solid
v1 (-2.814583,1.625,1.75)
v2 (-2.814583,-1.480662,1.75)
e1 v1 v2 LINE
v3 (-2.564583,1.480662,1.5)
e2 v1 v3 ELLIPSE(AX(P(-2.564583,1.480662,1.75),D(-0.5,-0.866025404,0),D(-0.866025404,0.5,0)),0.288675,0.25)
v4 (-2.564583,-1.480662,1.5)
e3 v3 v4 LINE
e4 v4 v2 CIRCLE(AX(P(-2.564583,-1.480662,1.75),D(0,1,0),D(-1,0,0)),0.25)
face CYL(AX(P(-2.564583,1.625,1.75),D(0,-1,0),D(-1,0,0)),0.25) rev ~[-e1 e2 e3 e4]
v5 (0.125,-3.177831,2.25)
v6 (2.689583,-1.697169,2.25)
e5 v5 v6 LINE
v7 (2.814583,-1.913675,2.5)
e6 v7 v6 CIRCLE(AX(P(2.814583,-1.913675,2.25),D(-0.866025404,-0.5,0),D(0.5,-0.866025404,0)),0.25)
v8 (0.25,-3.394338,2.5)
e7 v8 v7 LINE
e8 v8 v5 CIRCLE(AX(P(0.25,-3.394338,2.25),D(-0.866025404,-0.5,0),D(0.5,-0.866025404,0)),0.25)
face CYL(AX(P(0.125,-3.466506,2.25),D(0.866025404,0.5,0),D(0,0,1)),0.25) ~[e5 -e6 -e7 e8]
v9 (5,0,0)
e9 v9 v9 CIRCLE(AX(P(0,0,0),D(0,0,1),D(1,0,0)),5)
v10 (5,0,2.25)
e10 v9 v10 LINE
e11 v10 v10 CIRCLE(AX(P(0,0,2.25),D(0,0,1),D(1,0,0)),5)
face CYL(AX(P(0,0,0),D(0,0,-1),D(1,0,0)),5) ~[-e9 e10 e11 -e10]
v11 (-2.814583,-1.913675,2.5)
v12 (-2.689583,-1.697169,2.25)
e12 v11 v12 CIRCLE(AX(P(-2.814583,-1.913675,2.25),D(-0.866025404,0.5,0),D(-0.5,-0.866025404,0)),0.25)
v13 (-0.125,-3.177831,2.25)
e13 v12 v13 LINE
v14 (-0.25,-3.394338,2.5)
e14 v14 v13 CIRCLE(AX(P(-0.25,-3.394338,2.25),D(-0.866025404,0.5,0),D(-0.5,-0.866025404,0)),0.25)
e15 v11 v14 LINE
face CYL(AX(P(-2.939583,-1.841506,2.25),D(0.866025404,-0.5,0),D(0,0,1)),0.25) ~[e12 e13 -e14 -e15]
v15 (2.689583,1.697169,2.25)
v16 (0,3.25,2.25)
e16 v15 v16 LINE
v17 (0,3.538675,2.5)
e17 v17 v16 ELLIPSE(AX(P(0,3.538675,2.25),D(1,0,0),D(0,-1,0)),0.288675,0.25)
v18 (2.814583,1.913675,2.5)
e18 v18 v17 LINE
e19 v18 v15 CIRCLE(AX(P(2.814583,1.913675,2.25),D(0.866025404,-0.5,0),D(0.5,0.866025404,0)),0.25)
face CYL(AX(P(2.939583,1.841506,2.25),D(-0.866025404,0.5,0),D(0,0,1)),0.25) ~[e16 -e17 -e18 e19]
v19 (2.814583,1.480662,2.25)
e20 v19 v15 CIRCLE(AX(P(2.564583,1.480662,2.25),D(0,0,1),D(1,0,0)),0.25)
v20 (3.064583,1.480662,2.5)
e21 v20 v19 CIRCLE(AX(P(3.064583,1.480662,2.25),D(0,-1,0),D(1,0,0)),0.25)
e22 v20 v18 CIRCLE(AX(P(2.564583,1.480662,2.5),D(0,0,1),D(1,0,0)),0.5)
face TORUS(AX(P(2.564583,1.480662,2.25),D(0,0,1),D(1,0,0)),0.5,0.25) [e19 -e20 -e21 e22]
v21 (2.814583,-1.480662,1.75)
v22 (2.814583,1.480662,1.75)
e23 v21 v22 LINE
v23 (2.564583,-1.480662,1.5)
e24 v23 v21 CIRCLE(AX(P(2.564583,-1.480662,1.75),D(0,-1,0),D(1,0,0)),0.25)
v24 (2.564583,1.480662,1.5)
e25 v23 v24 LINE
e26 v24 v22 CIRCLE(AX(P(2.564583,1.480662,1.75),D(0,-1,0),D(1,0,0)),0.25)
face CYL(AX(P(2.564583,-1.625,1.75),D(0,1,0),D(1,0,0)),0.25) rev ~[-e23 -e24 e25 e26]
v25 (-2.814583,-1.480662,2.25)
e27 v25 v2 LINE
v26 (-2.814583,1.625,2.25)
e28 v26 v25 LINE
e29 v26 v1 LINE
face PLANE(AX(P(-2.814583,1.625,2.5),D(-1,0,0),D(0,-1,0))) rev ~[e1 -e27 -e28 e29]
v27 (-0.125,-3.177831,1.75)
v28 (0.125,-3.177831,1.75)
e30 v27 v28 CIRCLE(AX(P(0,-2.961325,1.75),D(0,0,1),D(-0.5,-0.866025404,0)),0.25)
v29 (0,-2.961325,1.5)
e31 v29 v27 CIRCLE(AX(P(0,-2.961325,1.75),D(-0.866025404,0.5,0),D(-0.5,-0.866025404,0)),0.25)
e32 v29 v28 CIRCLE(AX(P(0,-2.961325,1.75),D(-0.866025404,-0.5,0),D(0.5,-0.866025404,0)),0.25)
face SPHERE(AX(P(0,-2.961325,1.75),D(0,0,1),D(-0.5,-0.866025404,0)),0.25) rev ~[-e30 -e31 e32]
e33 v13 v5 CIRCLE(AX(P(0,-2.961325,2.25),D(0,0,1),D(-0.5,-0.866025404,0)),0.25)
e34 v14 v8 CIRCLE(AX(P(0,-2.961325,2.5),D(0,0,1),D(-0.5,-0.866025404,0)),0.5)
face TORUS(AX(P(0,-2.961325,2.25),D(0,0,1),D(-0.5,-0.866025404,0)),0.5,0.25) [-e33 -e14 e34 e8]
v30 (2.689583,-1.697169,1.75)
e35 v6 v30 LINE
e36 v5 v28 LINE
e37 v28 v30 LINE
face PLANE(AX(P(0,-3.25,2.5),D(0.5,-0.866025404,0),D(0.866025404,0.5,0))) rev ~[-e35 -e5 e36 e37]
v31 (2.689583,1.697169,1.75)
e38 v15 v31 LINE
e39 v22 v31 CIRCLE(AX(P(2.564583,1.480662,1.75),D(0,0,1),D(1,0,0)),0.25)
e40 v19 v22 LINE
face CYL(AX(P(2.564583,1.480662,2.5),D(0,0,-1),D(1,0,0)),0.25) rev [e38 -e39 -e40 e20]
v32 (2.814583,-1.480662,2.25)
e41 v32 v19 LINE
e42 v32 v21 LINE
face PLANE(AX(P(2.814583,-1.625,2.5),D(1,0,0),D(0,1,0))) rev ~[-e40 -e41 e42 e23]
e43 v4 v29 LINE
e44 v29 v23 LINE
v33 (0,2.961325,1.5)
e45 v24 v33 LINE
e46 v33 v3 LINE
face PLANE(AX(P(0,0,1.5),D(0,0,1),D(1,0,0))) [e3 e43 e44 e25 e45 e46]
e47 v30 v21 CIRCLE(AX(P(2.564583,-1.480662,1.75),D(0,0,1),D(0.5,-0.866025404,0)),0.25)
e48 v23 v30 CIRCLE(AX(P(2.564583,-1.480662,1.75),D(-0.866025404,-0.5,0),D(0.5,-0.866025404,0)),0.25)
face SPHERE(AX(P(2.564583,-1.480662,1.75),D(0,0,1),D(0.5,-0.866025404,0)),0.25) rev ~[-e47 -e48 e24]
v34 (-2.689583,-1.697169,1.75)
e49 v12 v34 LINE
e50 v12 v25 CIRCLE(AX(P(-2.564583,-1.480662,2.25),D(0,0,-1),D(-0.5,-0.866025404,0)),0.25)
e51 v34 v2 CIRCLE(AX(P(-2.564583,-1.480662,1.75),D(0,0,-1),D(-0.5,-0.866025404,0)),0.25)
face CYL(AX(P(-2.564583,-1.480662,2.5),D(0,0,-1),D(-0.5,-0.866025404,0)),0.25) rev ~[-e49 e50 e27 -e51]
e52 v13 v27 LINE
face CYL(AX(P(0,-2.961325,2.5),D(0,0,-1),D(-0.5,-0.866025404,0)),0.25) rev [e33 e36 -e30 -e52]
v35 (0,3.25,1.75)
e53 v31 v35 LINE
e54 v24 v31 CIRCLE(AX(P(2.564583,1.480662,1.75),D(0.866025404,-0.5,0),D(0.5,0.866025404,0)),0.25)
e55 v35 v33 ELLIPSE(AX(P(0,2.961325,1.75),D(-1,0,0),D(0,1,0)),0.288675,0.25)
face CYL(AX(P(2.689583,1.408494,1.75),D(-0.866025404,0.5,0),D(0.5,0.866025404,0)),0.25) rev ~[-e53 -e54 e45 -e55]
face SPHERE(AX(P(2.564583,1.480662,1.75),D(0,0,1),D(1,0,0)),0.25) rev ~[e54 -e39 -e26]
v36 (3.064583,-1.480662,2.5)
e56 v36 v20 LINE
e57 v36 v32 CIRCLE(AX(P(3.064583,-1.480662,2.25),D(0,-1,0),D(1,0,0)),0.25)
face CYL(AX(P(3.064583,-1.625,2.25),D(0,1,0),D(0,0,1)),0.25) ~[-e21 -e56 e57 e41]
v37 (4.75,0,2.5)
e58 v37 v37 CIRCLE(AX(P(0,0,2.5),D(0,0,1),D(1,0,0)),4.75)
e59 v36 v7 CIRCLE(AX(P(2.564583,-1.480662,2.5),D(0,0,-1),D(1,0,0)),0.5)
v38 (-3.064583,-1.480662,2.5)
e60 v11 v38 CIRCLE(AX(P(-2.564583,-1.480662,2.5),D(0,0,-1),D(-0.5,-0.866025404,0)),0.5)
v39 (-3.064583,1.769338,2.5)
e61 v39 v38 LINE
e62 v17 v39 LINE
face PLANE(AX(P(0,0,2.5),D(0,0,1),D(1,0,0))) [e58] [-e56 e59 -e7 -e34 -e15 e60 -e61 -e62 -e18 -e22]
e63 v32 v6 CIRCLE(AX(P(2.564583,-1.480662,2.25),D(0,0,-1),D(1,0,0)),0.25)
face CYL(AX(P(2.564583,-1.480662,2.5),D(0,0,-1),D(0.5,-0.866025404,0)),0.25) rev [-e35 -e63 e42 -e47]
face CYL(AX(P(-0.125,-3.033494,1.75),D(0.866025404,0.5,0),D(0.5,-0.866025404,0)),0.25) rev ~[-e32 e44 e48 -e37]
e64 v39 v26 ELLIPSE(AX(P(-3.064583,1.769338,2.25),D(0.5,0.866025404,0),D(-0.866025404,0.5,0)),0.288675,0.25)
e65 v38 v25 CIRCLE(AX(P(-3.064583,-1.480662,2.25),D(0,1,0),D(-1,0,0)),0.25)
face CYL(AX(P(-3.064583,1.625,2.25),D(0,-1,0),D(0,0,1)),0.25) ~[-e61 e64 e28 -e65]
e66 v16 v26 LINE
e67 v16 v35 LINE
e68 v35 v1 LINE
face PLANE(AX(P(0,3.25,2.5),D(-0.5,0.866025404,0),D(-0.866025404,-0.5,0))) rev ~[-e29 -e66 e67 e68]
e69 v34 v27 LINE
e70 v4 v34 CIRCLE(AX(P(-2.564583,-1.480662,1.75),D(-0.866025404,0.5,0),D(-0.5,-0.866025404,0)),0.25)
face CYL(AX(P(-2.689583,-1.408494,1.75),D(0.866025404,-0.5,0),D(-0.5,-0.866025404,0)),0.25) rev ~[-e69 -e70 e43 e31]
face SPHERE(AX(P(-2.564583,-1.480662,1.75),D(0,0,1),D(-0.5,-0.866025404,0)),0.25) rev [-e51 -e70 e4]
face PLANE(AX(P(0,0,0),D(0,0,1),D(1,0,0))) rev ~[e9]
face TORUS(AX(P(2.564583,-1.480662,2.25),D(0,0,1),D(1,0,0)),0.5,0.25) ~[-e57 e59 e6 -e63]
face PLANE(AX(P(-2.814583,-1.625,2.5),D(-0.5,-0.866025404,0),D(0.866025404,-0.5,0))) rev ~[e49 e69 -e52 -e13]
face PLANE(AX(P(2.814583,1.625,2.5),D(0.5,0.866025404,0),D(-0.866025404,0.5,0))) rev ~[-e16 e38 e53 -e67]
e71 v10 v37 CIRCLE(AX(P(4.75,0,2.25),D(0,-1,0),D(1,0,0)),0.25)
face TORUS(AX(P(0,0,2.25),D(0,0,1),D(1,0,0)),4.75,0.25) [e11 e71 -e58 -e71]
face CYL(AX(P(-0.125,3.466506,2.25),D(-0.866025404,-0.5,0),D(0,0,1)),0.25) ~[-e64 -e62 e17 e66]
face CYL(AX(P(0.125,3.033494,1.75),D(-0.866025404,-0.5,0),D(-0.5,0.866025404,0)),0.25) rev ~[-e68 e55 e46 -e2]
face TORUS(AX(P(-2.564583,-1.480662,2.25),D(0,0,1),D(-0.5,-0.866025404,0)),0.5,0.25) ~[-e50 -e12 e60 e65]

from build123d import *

# Parameters (mm, degrees)
F0_R     = 5
F1_DEPTH = 2.5
F3_DEPTH = 1
F4_R     = 0.25


with BuildPart() as f1:
    # F0 (on Top) → F1 (new body)
    with BuildSketch(Plane.XY):
        Circle(F0_R)
    extrude(amount=F1_DEPTH)

    # F2 (on face) → F3 (cut)
    with BuildSketch(Plane.XY.offset(2.5)):
        Polygon((-2.8145825623, -1.625), (0, -3.25), (2.8145825623, -1.625), (2.8145825623, 1.625), (0, 3.25), (-2.8145825623, 1.625), align=None)
    extrude(amount=-F3_DEPTH, mode=Mode.SUBTRACT)

    # F4
    f4_edges = [f1.edges().sort_by_distance(p)[0] for p in [
        (-1.407291, -2.4375, 1.5),
        (1.407291, -2.4375, 1.5),
        (2.814583, 0, 1.5),
        (1.407291, 2.4375, 1.5),
        (-1.407291, 2.4375, 1.5),
        (-2.814583, 0, 1.5),
        (2.814583, -1.625, 2),
        (2.814583, 1.625, 2),
        (2.814583, 0, 2.5),
        (-1.407291, 2.4375, 2.5),
        (-2.814583, 0, 2.5),
        (-2.814583, -1.625, 2),
        (0, -3.25, 2),
        (-1.407291, -2.4375, 2.5),
        (1.407291, -2.4375, 2.5),
        (-5, 0, 2.5),
        (1.407291, 2.4375, 2.5),
    ]]
    fillet(f4_edges, radius=F4_R)


solid = f1.part
